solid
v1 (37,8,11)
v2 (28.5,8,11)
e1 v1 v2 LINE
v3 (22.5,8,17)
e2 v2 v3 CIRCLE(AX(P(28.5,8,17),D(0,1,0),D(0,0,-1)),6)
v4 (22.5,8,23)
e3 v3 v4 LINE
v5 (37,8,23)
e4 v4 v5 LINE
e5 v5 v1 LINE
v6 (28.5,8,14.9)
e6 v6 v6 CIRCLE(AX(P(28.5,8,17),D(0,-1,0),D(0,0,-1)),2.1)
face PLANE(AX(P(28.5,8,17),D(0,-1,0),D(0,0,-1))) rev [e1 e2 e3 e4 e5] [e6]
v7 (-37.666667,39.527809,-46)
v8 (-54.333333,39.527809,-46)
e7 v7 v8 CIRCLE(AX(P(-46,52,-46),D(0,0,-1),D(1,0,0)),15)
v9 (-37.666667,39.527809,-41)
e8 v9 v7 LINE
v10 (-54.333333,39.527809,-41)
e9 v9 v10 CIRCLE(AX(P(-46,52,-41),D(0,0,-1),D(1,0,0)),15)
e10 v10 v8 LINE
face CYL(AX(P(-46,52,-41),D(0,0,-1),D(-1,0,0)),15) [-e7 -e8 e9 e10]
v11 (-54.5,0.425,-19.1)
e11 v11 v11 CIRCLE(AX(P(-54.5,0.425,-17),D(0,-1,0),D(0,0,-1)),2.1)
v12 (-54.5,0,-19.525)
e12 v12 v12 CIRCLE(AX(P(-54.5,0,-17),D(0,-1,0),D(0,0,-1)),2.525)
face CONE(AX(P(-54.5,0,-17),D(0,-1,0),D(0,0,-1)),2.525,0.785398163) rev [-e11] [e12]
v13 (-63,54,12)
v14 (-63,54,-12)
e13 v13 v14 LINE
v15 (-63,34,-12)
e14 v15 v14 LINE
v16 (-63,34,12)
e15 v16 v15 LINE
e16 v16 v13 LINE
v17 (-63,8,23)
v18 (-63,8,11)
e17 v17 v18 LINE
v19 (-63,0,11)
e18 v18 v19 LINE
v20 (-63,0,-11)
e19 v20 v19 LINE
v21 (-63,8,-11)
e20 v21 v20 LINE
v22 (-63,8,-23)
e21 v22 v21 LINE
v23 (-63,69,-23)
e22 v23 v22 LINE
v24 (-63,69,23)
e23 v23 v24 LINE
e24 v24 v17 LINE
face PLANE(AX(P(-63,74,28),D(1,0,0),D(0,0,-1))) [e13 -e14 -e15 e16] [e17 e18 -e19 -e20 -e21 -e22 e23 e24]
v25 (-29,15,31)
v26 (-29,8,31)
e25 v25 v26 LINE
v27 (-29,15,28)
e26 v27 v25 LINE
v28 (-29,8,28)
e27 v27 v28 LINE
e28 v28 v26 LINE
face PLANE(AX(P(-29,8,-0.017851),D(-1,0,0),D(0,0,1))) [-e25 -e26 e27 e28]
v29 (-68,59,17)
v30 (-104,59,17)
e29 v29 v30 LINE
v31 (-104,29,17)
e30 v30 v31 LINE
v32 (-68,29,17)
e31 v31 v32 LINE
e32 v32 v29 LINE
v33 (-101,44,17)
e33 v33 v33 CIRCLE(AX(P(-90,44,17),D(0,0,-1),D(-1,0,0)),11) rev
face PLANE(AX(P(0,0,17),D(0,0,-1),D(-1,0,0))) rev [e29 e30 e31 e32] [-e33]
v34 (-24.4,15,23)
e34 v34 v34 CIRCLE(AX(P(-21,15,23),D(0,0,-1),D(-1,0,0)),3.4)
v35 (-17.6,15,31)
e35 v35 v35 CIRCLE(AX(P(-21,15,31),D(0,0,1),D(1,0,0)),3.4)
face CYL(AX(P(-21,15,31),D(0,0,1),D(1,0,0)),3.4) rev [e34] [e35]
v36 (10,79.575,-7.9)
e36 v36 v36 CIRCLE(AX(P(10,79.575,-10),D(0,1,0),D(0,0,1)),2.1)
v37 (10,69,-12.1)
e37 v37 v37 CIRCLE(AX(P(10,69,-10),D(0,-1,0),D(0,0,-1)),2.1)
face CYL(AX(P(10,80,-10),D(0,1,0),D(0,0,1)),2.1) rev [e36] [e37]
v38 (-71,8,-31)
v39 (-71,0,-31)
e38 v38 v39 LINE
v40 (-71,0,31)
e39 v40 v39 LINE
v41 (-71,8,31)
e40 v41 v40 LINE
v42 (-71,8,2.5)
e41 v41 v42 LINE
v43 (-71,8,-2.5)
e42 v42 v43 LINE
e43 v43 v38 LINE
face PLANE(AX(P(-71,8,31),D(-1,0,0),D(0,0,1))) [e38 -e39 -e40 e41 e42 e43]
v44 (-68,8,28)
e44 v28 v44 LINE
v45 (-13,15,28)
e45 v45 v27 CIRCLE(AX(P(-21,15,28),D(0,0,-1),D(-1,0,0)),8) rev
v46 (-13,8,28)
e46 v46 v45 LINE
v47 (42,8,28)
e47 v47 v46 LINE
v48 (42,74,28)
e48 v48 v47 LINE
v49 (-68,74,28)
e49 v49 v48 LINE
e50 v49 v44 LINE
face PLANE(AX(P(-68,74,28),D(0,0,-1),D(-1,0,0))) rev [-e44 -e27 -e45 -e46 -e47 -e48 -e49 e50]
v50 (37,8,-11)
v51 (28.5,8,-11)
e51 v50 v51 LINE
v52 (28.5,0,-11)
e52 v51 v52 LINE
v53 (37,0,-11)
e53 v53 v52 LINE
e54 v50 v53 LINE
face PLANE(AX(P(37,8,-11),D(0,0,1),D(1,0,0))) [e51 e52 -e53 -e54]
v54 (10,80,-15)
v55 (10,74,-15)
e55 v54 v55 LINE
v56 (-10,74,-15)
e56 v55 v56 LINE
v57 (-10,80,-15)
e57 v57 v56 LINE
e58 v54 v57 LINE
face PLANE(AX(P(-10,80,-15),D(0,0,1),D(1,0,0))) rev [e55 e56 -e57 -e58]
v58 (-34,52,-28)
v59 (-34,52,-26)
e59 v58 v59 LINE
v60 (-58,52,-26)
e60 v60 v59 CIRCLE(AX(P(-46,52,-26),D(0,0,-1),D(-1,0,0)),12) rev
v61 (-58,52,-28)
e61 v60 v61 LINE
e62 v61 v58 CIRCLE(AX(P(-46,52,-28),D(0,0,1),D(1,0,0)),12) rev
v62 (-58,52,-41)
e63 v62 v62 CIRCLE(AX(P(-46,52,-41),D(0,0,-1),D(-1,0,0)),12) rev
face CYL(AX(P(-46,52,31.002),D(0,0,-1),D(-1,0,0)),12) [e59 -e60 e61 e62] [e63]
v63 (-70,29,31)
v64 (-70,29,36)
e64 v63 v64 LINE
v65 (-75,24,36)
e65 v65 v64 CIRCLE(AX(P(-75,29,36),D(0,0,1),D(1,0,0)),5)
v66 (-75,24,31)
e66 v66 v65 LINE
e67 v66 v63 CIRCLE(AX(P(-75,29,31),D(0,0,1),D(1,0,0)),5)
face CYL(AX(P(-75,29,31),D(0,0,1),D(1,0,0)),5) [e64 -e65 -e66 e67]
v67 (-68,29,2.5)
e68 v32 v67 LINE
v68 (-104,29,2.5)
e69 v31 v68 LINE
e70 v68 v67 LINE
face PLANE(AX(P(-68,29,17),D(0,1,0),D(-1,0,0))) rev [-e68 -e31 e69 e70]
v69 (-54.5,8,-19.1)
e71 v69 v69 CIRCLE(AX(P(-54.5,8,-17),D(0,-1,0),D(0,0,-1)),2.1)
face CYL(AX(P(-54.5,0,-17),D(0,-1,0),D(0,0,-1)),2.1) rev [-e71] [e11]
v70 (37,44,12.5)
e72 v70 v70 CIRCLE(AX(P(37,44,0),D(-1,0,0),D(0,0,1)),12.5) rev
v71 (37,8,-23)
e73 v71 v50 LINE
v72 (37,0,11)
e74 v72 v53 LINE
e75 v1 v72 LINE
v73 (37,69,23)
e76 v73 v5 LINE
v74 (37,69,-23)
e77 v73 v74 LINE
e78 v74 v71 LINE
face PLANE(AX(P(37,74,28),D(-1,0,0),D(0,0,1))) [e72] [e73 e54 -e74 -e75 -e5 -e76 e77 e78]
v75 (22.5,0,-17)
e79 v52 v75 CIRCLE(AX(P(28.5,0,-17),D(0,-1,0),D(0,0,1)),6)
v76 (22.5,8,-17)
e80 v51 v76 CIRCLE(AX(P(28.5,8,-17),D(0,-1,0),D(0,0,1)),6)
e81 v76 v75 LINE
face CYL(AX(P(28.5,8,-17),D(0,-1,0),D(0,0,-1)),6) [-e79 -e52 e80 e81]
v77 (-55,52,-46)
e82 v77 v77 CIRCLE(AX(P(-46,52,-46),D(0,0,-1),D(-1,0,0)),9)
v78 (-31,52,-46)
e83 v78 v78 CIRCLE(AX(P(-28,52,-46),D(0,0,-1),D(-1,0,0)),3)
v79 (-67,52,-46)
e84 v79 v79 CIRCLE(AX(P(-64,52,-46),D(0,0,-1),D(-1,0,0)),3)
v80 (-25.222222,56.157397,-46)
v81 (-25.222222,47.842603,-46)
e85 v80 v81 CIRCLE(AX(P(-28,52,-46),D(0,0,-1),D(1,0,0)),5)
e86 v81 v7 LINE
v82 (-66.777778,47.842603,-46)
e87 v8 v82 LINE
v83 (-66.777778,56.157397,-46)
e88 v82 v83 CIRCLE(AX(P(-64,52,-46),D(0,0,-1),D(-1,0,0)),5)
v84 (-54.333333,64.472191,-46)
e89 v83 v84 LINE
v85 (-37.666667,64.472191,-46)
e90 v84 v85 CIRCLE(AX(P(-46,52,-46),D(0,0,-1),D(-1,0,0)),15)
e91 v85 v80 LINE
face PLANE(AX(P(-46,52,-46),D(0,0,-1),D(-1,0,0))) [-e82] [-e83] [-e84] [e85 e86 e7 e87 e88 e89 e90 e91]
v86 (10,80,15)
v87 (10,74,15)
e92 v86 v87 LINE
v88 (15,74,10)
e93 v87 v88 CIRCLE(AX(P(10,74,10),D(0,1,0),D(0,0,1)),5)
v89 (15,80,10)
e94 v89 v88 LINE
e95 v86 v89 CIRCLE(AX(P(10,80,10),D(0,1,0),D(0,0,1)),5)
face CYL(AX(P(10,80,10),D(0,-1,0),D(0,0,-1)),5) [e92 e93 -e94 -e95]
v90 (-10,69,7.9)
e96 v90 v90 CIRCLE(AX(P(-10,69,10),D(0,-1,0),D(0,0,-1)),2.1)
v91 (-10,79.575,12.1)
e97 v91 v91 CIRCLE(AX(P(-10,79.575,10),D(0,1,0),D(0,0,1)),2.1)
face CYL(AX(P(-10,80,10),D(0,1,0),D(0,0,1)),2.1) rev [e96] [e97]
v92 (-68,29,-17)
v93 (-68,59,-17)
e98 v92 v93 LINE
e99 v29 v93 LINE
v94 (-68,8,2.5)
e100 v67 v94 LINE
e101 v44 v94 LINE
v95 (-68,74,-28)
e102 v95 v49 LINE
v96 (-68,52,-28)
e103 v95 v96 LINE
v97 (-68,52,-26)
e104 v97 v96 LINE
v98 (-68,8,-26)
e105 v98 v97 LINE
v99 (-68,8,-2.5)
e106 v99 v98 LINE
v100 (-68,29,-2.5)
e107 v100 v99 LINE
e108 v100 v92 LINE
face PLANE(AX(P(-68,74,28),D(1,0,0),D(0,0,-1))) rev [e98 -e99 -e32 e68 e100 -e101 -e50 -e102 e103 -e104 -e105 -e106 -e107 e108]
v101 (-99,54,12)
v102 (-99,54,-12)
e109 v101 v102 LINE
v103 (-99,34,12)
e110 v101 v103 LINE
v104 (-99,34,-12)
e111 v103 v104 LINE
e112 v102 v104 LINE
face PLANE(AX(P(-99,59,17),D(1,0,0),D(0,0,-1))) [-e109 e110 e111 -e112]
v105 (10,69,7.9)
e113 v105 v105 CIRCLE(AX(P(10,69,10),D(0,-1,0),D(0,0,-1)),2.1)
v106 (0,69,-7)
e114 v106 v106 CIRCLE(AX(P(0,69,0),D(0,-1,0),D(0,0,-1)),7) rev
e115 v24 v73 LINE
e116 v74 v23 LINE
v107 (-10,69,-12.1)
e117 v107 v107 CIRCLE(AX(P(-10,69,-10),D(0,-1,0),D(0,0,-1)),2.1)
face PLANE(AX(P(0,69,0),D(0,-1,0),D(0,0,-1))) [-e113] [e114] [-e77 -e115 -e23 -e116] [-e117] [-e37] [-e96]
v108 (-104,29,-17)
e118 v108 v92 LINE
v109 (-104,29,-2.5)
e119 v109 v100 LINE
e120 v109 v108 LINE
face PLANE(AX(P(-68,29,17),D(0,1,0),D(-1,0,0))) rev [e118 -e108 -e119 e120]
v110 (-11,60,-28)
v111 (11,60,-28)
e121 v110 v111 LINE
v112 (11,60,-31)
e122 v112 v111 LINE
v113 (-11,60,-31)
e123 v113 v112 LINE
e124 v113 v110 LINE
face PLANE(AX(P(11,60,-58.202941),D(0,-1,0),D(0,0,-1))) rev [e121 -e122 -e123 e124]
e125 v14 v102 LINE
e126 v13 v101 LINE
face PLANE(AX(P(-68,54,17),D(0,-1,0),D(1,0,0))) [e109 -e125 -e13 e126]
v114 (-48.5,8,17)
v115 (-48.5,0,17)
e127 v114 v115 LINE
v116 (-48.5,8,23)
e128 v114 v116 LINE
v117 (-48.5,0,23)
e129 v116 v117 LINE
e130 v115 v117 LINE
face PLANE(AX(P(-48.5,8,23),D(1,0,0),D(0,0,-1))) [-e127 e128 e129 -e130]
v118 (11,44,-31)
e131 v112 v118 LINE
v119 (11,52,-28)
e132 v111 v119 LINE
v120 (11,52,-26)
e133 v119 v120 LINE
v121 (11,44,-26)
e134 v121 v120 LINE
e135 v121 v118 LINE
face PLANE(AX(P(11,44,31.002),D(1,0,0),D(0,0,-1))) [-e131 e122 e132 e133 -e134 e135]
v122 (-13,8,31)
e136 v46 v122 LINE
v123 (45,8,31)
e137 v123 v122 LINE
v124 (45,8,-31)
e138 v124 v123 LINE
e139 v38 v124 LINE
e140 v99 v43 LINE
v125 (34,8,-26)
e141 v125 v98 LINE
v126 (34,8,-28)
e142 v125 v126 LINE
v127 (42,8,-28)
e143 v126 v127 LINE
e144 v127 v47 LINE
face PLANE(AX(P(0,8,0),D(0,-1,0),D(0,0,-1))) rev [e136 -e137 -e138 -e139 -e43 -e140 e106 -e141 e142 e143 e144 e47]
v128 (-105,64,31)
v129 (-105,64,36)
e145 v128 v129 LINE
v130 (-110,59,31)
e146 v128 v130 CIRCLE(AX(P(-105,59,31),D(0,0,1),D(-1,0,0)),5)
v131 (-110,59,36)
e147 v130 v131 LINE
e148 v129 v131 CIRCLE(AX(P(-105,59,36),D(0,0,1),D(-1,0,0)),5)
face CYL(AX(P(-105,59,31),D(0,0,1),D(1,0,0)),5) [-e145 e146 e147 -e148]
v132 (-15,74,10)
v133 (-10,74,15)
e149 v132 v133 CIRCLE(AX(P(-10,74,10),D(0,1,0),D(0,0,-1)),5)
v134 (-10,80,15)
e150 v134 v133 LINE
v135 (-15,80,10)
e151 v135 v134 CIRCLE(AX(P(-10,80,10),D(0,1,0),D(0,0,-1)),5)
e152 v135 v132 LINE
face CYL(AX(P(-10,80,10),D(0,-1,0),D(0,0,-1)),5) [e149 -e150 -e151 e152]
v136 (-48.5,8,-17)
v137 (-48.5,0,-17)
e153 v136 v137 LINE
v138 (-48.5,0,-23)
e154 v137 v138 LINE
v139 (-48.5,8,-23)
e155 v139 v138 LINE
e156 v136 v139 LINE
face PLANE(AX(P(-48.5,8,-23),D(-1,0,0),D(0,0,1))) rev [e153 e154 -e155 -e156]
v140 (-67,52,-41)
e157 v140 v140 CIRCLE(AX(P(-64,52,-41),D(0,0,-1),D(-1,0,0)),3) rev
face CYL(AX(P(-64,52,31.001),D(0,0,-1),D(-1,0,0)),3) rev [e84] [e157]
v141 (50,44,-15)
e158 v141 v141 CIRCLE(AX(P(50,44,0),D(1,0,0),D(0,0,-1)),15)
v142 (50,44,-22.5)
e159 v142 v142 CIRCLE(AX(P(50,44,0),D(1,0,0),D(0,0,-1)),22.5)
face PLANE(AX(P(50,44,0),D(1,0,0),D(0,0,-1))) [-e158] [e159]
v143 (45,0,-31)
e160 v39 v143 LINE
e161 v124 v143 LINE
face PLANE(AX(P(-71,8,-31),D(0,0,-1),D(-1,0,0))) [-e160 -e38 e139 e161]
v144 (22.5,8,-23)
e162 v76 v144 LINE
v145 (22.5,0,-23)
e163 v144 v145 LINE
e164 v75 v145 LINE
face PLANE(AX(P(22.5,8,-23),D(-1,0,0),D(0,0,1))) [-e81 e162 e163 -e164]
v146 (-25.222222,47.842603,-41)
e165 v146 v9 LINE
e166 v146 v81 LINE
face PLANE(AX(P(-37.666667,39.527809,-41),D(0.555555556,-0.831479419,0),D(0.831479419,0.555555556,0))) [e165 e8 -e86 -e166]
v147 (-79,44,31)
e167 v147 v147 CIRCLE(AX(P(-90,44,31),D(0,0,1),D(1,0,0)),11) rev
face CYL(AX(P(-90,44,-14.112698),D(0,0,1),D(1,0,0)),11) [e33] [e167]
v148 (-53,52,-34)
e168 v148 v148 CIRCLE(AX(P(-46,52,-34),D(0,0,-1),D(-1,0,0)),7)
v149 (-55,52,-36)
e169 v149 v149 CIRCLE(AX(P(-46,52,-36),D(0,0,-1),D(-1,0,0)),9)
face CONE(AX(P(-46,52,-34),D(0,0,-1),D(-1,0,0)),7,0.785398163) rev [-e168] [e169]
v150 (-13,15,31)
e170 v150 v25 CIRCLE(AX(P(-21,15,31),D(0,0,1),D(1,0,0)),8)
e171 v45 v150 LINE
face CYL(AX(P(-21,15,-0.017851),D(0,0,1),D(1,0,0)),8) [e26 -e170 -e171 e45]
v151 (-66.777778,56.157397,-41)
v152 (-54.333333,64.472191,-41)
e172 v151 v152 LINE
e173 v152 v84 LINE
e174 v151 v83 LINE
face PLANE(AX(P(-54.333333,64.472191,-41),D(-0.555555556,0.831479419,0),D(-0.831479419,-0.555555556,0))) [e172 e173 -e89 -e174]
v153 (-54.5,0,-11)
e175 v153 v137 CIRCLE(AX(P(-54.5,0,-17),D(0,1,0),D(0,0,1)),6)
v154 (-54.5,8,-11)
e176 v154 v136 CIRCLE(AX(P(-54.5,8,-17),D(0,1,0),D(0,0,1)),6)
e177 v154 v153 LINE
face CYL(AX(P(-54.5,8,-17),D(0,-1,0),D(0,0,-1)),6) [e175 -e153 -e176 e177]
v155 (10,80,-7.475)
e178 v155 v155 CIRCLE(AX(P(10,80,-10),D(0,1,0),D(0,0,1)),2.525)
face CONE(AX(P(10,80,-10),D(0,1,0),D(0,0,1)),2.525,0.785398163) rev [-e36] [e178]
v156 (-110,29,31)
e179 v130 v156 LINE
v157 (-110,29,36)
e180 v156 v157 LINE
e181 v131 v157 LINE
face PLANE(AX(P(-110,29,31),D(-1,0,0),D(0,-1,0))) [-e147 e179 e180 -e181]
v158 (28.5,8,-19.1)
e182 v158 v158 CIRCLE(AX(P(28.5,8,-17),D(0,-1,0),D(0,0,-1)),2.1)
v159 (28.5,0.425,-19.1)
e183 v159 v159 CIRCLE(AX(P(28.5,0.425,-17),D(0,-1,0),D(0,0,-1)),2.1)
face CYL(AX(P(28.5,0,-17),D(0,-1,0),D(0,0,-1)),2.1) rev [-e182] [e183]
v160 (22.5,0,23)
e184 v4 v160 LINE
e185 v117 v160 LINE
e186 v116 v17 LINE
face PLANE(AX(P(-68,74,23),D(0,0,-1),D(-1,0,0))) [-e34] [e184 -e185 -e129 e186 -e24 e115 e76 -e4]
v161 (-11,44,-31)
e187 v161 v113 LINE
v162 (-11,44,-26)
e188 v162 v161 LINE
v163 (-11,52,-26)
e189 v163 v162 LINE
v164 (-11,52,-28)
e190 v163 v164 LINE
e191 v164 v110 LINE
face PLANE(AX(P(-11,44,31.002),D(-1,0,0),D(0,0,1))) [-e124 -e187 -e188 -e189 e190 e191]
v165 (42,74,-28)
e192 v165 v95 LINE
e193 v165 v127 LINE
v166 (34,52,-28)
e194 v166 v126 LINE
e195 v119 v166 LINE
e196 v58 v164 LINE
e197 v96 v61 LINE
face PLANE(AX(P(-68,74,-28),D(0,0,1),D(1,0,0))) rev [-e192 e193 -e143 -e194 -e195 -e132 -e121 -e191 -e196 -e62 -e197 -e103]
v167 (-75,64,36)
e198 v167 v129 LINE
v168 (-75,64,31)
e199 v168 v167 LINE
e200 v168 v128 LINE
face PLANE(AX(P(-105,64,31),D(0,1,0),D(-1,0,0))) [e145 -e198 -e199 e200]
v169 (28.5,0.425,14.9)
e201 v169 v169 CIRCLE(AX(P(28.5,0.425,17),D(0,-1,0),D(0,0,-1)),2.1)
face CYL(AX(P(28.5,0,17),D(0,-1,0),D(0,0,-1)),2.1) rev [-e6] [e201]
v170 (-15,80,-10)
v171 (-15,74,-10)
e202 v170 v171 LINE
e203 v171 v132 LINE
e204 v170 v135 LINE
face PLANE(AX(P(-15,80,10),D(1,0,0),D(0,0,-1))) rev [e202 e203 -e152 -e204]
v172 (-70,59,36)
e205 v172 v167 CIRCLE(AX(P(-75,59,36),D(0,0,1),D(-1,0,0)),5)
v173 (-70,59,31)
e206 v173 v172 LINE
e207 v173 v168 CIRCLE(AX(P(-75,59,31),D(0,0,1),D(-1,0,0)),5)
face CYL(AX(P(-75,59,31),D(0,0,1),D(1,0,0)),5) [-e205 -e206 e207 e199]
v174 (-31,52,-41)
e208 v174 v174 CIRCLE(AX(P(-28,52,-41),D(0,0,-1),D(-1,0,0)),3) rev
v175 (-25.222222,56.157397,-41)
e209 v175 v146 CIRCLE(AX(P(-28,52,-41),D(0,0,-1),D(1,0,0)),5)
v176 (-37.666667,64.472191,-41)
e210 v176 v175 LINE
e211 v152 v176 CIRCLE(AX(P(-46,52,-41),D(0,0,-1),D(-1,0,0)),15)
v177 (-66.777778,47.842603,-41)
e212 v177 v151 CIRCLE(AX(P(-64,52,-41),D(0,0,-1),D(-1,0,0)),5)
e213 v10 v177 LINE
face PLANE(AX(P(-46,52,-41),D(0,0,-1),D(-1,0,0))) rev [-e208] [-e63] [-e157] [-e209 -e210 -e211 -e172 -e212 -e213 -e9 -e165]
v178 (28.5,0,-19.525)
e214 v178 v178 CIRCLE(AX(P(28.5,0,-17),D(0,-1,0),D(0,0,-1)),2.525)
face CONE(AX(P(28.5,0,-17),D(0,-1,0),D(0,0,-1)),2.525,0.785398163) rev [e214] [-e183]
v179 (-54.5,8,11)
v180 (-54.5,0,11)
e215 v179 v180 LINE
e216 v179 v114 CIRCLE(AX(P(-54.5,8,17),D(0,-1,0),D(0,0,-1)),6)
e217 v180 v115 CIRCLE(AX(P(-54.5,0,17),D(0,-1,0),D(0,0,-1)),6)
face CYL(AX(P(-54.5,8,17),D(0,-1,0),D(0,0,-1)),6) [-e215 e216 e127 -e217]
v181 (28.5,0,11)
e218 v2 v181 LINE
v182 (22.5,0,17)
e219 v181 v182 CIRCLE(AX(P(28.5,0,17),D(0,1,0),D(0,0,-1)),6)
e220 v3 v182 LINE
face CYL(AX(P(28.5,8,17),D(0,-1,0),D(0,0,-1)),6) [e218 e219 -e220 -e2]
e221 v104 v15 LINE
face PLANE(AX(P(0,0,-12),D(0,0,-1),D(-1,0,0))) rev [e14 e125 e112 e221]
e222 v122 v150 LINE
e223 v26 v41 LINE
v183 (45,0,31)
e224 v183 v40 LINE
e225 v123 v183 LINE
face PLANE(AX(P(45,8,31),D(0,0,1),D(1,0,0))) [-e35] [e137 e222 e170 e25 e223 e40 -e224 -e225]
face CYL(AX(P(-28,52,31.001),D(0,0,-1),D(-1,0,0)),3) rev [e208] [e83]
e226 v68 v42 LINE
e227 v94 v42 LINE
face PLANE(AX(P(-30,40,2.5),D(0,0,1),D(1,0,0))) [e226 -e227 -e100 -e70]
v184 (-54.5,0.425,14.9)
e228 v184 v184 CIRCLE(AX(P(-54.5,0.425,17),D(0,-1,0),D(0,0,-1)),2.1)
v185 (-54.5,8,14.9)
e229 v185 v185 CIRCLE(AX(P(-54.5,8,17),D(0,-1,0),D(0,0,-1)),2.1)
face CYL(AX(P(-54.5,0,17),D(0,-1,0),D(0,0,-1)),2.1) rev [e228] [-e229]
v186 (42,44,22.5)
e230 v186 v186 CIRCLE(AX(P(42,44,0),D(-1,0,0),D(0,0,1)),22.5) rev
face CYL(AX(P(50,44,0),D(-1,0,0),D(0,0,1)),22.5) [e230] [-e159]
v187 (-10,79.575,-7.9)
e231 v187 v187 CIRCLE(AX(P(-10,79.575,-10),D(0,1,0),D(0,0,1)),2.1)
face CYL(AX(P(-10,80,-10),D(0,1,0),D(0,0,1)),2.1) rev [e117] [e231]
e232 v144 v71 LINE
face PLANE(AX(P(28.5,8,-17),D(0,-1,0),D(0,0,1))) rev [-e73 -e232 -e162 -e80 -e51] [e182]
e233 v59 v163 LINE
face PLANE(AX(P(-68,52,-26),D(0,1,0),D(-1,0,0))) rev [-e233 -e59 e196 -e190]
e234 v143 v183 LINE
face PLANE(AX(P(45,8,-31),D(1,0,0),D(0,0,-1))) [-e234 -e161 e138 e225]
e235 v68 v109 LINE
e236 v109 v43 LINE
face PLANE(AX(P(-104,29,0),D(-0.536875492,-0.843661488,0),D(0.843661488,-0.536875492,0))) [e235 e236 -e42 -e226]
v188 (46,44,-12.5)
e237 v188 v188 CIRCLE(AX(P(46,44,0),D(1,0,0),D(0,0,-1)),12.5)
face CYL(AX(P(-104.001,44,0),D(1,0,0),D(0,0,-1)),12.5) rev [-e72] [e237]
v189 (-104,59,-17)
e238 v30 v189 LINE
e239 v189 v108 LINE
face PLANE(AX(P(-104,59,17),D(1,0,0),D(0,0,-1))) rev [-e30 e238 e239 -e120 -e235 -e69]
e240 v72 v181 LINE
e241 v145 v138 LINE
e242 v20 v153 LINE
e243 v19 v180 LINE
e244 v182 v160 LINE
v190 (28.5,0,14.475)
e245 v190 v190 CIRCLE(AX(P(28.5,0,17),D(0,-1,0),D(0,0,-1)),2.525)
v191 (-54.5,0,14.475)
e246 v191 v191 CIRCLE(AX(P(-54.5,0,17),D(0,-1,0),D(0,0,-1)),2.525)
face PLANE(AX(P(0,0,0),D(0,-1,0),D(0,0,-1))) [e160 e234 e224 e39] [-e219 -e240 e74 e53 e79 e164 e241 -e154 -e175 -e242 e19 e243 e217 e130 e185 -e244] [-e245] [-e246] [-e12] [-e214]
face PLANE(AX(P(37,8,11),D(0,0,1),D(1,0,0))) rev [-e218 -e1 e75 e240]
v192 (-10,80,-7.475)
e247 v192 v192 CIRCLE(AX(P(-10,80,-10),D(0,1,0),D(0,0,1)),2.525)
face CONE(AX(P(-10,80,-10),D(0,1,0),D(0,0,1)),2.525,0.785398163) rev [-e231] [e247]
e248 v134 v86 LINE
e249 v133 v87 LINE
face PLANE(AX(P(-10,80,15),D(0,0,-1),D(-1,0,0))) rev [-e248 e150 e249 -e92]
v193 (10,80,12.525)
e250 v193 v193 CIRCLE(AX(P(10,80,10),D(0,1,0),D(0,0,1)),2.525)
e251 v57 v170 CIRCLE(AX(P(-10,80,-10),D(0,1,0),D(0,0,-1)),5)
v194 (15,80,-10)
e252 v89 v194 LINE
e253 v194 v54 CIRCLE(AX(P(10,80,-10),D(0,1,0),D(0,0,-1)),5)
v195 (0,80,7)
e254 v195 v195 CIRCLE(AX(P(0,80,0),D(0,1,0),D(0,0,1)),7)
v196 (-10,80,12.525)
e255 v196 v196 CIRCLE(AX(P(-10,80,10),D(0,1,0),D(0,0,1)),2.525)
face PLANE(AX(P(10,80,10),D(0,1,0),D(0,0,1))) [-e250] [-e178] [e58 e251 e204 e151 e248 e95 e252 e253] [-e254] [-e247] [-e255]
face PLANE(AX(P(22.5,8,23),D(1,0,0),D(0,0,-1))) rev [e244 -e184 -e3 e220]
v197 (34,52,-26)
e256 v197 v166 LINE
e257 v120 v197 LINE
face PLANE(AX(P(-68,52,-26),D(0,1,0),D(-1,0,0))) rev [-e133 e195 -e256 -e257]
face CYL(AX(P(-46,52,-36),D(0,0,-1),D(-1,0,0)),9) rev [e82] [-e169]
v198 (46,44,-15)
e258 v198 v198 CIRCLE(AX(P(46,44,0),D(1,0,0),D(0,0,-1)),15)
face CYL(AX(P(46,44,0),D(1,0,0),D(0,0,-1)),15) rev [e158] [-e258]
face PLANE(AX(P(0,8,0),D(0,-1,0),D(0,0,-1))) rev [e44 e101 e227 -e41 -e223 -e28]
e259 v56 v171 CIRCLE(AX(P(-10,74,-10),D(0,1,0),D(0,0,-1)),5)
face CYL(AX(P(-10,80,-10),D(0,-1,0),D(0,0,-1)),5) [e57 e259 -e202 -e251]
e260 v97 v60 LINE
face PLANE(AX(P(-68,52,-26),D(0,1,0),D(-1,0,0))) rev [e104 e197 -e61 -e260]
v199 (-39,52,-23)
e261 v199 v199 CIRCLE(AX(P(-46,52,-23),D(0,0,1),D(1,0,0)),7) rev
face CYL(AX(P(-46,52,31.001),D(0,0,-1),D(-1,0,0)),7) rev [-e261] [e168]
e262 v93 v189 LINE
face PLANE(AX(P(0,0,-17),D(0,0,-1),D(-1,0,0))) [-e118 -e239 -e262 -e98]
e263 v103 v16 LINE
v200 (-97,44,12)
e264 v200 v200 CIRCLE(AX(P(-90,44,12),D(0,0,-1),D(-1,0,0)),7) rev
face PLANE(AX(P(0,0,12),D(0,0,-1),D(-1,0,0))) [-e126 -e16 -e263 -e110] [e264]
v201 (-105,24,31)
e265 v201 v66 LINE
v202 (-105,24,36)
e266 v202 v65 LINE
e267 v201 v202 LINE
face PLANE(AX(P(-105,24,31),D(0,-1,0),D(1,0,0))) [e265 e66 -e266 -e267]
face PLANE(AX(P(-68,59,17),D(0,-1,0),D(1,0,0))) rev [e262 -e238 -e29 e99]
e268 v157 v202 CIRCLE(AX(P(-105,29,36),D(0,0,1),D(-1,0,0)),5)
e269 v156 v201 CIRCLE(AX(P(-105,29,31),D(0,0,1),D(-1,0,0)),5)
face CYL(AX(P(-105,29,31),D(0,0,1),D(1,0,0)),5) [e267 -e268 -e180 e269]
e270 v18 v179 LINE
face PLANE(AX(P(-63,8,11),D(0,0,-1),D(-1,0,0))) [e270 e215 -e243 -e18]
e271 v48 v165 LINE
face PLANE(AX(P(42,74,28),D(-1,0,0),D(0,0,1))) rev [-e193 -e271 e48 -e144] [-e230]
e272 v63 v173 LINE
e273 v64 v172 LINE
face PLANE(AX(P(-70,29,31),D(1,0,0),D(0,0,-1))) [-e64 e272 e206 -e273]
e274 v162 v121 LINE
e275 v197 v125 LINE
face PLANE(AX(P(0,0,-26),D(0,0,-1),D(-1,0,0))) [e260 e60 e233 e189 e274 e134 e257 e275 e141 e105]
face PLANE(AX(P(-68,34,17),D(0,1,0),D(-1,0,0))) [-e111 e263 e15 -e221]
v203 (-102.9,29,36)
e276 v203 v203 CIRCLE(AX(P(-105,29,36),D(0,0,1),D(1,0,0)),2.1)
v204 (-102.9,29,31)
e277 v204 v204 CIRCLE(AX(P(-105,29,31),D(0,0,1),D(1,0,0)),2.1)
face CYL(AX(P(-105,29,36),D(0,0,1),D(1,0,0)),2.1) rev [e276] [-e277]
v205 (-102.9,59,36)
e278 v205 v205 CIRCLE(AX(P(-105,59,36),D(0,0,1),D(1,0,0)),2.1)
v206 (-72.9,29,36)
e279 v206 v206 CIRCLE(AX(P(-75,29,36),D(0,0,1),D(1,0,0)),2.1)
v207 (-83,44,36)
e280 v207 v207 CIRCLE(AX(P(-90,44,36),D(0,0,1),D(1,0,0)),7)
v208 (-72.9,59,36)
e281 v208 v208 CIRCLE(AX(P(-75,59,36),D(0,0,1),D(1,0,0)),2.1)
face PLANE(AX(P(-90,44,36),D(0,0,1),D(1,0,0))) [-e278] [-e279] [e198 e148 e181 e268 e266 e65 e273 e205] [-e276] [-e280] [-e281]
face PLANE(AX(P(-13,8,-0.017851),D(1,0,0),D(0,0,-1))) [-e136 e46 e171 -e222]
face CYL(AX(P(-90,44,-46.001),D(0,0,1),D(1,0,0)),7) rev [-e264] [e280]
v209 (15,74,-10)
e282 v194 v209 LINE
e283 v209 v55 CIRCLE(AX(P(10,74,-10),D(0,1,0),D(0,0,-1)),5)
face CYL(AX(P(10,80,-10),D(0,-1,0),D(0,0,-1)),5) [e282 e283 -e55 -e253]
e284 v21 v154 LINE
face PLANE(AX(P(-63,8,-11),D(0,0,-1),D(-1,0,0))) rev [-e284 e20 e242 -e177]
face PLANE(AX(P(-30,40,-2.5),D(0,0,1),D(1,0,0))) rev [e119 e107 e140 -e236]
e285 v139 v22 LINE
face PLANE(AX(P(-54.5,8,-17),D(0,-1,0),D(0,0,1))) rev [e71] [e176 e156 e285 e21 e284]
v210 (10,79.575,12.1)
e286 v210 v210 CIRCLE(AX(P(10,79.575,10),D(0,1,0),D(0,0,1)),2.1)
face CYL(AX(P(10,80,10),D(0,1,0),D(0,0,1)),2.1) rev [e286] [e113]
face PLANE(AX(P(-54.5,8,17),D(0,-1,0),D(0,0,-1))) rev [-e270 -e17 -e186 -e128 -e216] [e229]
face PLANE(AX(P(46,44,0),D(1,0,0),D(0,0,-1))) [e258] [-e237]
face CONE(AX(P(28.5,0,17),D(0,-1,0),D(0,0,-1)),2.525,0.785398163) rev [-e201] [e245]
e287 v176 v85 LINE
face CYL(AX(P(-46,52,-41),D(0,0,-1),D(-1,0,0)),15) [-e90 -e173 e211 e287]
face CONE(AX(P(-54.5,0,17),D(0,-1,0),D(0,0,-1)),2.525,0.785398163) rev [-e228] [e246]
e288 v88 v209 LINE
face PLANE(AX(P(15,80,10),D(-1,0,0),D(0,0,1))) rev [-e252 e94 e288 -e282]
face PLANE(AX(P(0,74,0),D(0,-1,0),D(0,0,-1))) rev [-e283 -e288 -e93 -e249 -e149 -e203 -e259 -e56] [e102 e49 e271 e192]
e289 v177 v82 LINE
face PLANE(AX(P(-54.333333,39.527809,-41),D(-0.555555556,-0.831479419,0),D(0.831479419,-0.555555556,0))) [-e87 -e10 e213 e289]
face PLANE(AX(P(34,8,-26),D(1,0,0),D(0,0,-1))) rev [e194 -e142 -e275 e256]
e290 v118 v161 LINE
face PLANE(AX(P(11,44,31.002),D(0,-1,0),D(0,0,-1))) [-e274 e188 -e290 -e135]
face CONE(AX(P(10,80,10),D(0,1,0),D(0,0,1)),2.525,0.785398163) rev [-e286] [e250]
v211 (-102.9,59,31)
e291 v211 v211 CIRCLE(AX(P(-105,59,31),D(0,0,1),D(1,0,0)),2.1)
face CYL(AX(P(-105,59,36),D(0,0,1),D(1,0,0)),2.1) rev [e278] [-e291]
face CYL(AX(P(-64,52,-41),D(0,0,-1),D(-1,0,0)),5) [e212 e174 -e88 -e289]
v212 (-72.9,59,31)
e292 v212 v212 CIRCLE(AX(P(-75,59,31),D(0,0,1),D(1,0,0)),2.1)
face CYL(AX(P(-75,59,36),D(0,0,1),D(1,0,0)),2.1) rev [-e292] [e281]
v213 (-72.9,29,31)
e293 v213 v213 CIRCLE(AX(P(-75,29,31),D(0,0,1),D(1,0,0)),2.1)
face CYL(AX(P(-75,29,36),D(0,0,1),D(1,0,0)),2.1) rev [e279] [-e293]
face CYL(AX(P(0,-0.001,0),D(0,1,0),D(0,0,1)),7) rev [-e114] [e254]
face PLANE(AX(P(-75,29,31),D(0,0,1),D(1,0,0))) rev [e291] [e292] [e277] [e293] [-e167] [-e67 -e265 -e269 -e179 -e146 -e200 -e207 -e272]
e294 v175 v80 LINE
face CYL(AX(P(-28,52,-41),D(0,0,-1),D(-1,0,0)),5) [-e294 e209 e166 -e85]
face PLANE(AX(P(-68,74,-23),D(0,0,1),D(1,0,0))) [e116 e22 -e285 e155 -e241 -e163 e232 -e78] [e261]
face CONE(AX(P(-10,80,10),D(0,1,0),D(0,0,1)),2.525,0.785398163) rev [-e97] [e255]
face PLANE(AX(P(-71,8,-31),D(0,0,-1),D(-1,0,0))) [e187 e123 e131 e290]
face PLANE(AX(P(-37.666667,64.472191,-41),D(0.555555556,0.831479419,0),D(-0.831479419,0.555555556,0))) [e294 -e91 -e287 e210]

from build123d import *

# Parameters (mm, degrees)
SKETCH_1_W                                = 110
SKETCH_1_H                                = 56
EXTRUDE_1_DEPTH                           = 74
SKETCH_2_W                                = 36
SKETCH_2_H                                = 30
EXTRUDE_2_DEPTH                           = 17
SHELL_1_T                                 = -5
SKETCH_3_W                                = 116
SKETCH_3_H                                = 62
SKETCH_3_W_2                              = 110
SKETCH_3_H_2                              = 56
EXTRUDE_3_DEPTH                           = 8
EXTRUDE_4_DEPTH                           = 8
MIRROR_1_AT_THE_SECOND_PLANE_COPY_1_DEPTH = 8
HOLE_WIZARD_M5_1_D                        = 4.2
HOLE_WIZARD_M5_1_DEPTH                    = 8
HOLE_WIZARD_M5_1_CSINK_D                  = 5.05
HOLE_WIZARD_M5_1_CSINK_ANGLE              = 90
EXTRUDE_5_DEPTH                           = 6
HOLE_WIZARD_M5_2_D                        = 4.2
HOLE_WIZARD_M5_2_CSINK_D                  = 5.05
HOLE_WIZARD_M5_2_CSINK_ANGLE              = 90
CUT_EXTRUDE_1_REACH                       = 136.822
SKETCH_10_R                               = 7
SKETCH_29_W                               = 102
SKETCH_29_H                               = 44
CUT_EXTRUDE_8_DEPTH                       = 2
EXTRUDE_START                             = 26
SKETCH_11_R                               = 12
EXTRUDE_6_DEPTH                           = 20
EXTRUDE_7_DEPTH                           = 5
CUT_EXTRUDE_2_REACH                       = 154.135
SKETCH_13_R                               = 3
SKETCH_14_R                               = 9
CUT_EXTRUDE_3_DEPTH                       = 10
CUT_EXTRUDE_4_REACH                       = 149.326
SKETCH_15_R                               = 7
CHAMFER_1_SIZE                            = 2
EXTRUDE_8_REACH                           = 145.865
SKETCH_16_W                               = 22
SKETCH_16_H                               = 16
EXTRUDE_8_DIRECTION_2_REACH               = 145.865
SKETCH_17_R                               = 22.5
EXTRUDE_9_DEPTH                           = 8
SKETCH_18_R                               = 15
CUT_EXTRUDE_5_DEPTH                       = 4
CUT_EXTRUDE_6_REACH                       = 178.114
SKETCH_19_R                               = 12.5
EXTRUDE_10_DEPTH                          = 3
HOLE_WIZARD_M8_1_D                        = 6.8
HOLE_WIZARD_M8_1_DEPTH                    = 8
EXTRUDE_START_2                           = 17
SKETCH_23_R                               = 11
EXTRUDE_11_DEPTH                          = 19
EXTRUDE_12_DEPTH                          = 5
HOLE_START                                = 31
HOLE_WIZARD_M5_3_OUTLINE_R                = 2.1
HOLE_WIZARD_M5_3_DEPTH                    = 5
CUT_EXTRUDE_7_REACH                       = 160.821
SKETCH_27_R                               = 7
RIB_1_REACH                               = 145.583
SKETCH_30_WALL_W                          = 328.280671964
SKETCH_30_WALL_H                          = 5


# Read off the part's stored shape, not the designer's step: M5 螺纹孔3
with BuildPart() as part:
    # 草图1 → 凸台-拉伸1 (new body)
    with BuildSketch(Plane(origin=(0, 0, 0), x_dir=(1, 0, 0), z_dir=(0, 1, 0))):
        with Locations((-13, 0)):
            Rectangle(SKETCH_1_W, SKETCH_1_H)
    extrude(amount=EXTRUDE_1_DEPTH)

    # 草图2 → 凸台-拉伸2 (add, symmetric)
    with BuildSketch(Plane.XY):
        with Locations((-86, 44)):
            Rectangle(SKETCH_2_W, SKETCH_2_H)
    extrude(amount=EXTRUDE_2_DEPTH, both=True)

    # 抽壳1
    shell_1_openings = [part.faces().sort_by_distance(p)[0] for p in [
        (-13, 0, 0),
    ]]
    offset(amount=SHELL_1_T, openings=shell_1_openings, kind=Kind.INTERSECTION)

    # 草图3 → 凸台-拉伸3 (add)
    with BuildSketch(Plane.XZ):
        with Locations((-13, 0)):
            Rectangle(SKETCH_3_W, SKETCH_3_H)
        with Locations((-13, 0)):
            Rectangle(SKETCH_3_W_2, SKETCH_3_H_2, mode=Mode.SUBTRACT)
    extrude(amount=-EXTRUDE_3_DEPTH)

    # 草图4 → 凸台-拉伸4 (add)
    with BuildSketch(Plane.XZ):
        with BuildLine():
            Line((-63, 23), (-48.5, 23))
            Line((-48.5, 23), (-48.5, 17))
            ThreePointArc((-48.5, 17), (-50.257359313, 12.757359313), (-54.5, 11))
            Line((-54.5, 11), (-63, 11))
            Line((-63, 11), (-63, 23))
        make_face()
    extrude_4 = extrude(amount=-EXTRUDE_4_DEPTH)

    # 镜向1: 凸台-拉伸4 across plane
    add(extrude_4.mirror(Plane.ZY.offset(13)))

    # 镜向1 at the second plane: 凸台-拉伸4 across plane
    add(extrude_4.mirror(Plane.XY))

    # 镜向1 at the second plane copy 1 sket → 镜向1 at the second plane copy 1 (add)
    with BuildSketch(Plane(origin=(-26, 0, 0), x_dir=(-1, 0, 0), z_dir=(0, -1, 0))):
        with BuildLine():
            Line((-63, 23), (-48.5, 23))
            Line((-48.5, 23), (-48.5, 17))
            ThreePointArc((-48.5, 17), (-50.257359313, 12.757359313), (-54.5, 11))
            Line((-54.5, 11), (-63, 11))
            Line((-63, 11), (-63, 23))
        make_face()
    extrude(amount=-MIRROR_1_AT_THE_SECOND_PLANE_COPY_1_DEPTH)

    # M5 螺纹孔1
    with Locations(Plane.XZ):
        with Locations((28.5, 17), (-54.5, 17), (-54.5, -17), (28.5, -17)):
            CounterSinkHole(HOLE_WIZARD_M5_1_D / 2, HOLE_WIZARD_M5_1_CSINK_D / 2, depth=HOLE_WIZARD_M5_1_DEPTH, counter_sink_angle=HOLE_WIZARD_M5_1_CSINK_ANGLE)

    # 草图7 → 凸台-拉伸5 (add)
    with BuildSketch(Plane(origin=(0, 74, 0), x_dir=(1, 0, 0), z_dir=(0, 1, 0))):
        with BuildLine():
            Line((-10, -15), (10, -15))
            ThreePointArc((10, -15), (13.535533906, -13.535533906), (15, -10))
            Line((15, -10), (15, 10))
            ThreePointArc((15, 10), (13.535533906, 13.535533906), (10, 15))
            Line((10, 15), (-10, 15))
            ThreePointArc((-10, 15), (-13.535533906, 13.535533906), (-15, 10))
            Line((-15, 10), (-15, -10))
            ThreePointArc((-15, -10), (-13.535533906, -13.535533906), (-10, -15))
        make_face()
    extrude(amount=EXTRUDE_5_DEPTH)

    # M5 螺纹孔2 (through all)
    with Locations(Plane(origin=(0, 80, 0), x_dir=(1, 0, 0), z_dir=(0, 1, 0))):
        with Locations((10, 10), (-10, 10), (-10, -10), (10, -10)):
            CounterSinkHole(HOLE_WIZARD_M5_2_D / 2, HOLE_WIZARD_M5_2_CSINK_D / 2, counter_sink_angle=HOLE_WIZARD_M5_2_CSINK_ANGLE)

    # 草图10 → 切除-拉伸1 (cut, up to next)
    with BuildSketch(Plane(origin=(0, 80, 0), x_dir=(1, 0, 0), z_dir=(0, 1, 0)), mode=Mode.PRIVATE) as cut_extrude_1_sk1:
        with Locations(Location((0, 0, 0), (0, 0, 270))):
            Circle(SKETCH_10_R)
    cut_extrude_1_tool1 = extrude(cut_extrude_1_sk1.sketch, amount=-CUT_EXTRUDE_1_REACH, mode=Mode.PRIVATE) & part.part
    add(cut_extrude_1_tool1.solids().sort_by_distance((0, 80, 0))[0], mode=Mode.SUBTRACT)

    # 草图29 → 切除-拉伸8 (cut)
    with BuildSketch(Plane(origin=(0, 0, -28), x_dir=(-1, 0, 0), z_dir=(0, 0, -1))):
        with Locations((17, 30)):
            Rectangle(SKETCH_29_W, SKETCH_29_H)
    extrude(amount=-CUT_EXTRUDE_8_DEPTH, mode=Mode.SUBTRACT)

    # 草图11 → 凸台-拉伸6 (add)
    with BuildSketch(Plane(origin=(0, 0, 0), x_dir=(-1, 0, 0), z_dir=(0, 0, -1)).offset(EXTRUDE_START)):
        with Locations((46, 52)):
            Circle(SKETCH_11_R)
    extrude(amount=EXTRUDE_6_DEPTH)

    # 草图12 → 凸台-拉伸7 (add)
    with BuildSketch(Plane(origin=(0, 0, -46), x_dir=(-1, 0, 0), z_dir=(0, 0, -1))):
        with BuildLine():
            Line((54.333333333, 64.472191289), (66.777777778, 56.157397096))
            ThreePointArc((66.777777778, 56.157397096), (69, 52), (66.777777778, 47.842602904))
            Line((66.777777778, 47.842602904), (54.333333333, 39.527808711))
            ThreePointArc((54.333333333, 39.527808711), (46, 37), (37.666666667, 39.527808711))
            Line((37.666666667, 39.527808711), (25.222222222, 47.842602904))
            ThreePointArc((25.222222222, 47.842602904), (23, 52), (25.222222222, 56.157397096))
            Line((25.222222222, 56.157397096), (37.666666667, 64.472191289))
            ThreePointArc((37.666666667, 64.472191289), (46, 67), (54.333333333, 64.472191289))
        make_face()
    extrude(amount=-EXTRUDE_7_DEPTH)

    # 草图13 → 切除-拉伸2 (cut, up to next)
    with BuildSketch(Plane(origin=(0, 0, -46), x_dir=(-1, 0, 0), z_dir=(0, 0, -1)), mode=Mode.PRIVATE) as cut_extrude_2_sk1:
        with Locations((28, 52)):
            Circle(SKETCH_13_R)
    cut_extrude_2_tool1 = extrude(cut_extrude_2_sk1.sketch, amount=-CUT_EXTRUDE_2_REACH, mode=Mode.PRIVATE) & part.part
    # 草图13 → 切除-拉伸2 (cut, up to next)
    with BuildSketch(Plane(origin=(0, 0, -46), x_dir=(-1, 0, 0), z_dir=(0, 0, -1)), mode=Mode.PRIVATE) as cut_extrude_2_sk2:
        with Locations((64, 52)):
            Circle(SKETCH_13_R)
    cut_extrude_2_tool2 = extrude(cut_extrude_2_sk2.sketch, amount=-CUT_EXTRUDE_2_REACH, mode=Mode.PRIVATE) & part.part
    add(cut_extrude_2_tool1.solids().sort_by_distance((-28, 52, -46))[0], mode=Mode.SUBTRACT)
    add(cut_extrude_2_tool2.solids().sort_by_distance((-64, 52, -46))[0], mode=Mode.SUBTRACT)

    # 草图14 → 切除-拉伸3 (cut)
    with BuildSketch(Plane(origin=(0, 0, -46), x_dir=(-1, 0, 0), z_dir=(0, 0, -1))):
        with Locations((46, 52)):
            Circle(SKETCH_14_R)
    extrude(amount=-CUT_EXTRUDE_3_DEPTH, mode=Mode.SUBTRACT)

    # 草图15 → 切除-拉伸4 (cut, up to next)
    with BuildSketch(Plane(origin=(0, 0, -36), x_dir=(-1, 0, 0), z_dir=(0, 0, -1)), mode=Mode.PRIVATE) as cut_extrude_4_sk1:
        with Locations((46, 52)):
            Circle(SKETCH_15_R)
    cut_extrude_4_tool1 = extrude(cut_extrude_4_sk1.sketch, amount=-CUT_EXTRUDE_4_REACH, mode=Mode.PRIVATE) & part.part
    add(cut_extrude_4_tool1.solids().sort_by_distance((-46, 52, -36))[0], mode=Mode.SUBTRACT)

    # 倒角1
    chamfer_1_edges = [part.edges().sort_by_distance(p)[0] for p in [
        (-39, 52, -36),
    ]]
    chamfer(chamfer_1_edges, length=CHAMFER_1_SIZE - 0.0001)  # a hair under: the kernel refuses the full size

    # 凸台-拉伸8: up to this face of the body (flat: up to its plane)
    extrude_8_end = Plane(part.part.faces().sort_by_distance((-13, 4, -31))[0])
    # 草图16 → 凸台-拉伸8 (add, up to the picked face)
    with BuildSketch(Plane(origin=(0, 0, -28), x_dir=(-1, 0, 0), z_dir=(0, 0, -1)), mode=Mode.PRIVATE) as extrude_8_sk1:
        with Locations((0, 52)):
            Rectangle(SKETCH_16_W, SKETCH_16_H)
    extrude_8_tool1 = split(extrude(extrude_8_sk1.sketch, amount=EXTRUDE_8_REACH, mode=Mode.PRIVATE), bisect_by=extrude_8_end, keep=Keep.BOTH, mode=Mode.PRIVATE)
    add(extrude_8_tool1.solids().sort_by(Axis((0, 52, -28), (0, 0, -1)))[0])

    # 草图16 → 凸台-拉伸8 direction 2 (add, up to next)
    with BuildSketch(Plane(origin=(0, 0, -28), x_dir=(-1, 0, 0), z_dir=(0, 0, -1)), mode=Mode.PRIVATE) as extrude_8_direction_2_sk1:
        with Locations((0, 52)):
            Rectangle(SKETCH_16_W, SKETCH_16_H)
    extrude_8_direction_2_tool1 = extrude(extrude_8_direction_2_sk1.sketch, amount=-EXTRUDE_8_DIRECTION_2_REACH, mode=Mode.PRIVATE) - part.part
    add(extrude_8_direction_2_tool1.solids().sort_by_distance((0, 52, -28))[0])

    # 草图17 → 凸台-拉伸9 (add)
    with BuildSketch(Plane(origin=(42, 0, 0), x_dir=(0, 0, -1), z_dir=(1, 0, 0))):
        with Locations(Location((0, 44, 0), (0, 0, 180))):
            Circle(SKETCH_17_R)
    extrude(amount=EXTRUDE_9_DEPTH)

    # 草图18 → 切除-拉伸5 (cut)
    with BuildSketch(Plane(origin=(50, 0, 0), x_dir=(0, 0, -1), z_dir=(1, 0, 0))):
        with Locations((0, 44)):
            Circle(SKETCH_18_R)
    extrude(amount=-CUT_EXTRUDE_5_DEPTH, mode=Mode.SUBTRACT)

    # 草图19 → 切除-拉伸6 (cut, up to next)
    with BuildSketch(Plane(origin=(46, 0, 0), x_dir=(0, 0, -1), z_dir=(1, 0, 0)), mode=Mode.PRIVATE) as cut_extrude_6_sk1:
        with Locations((0, 44)):
            Circle(SKETCH_19_R)
    cut_extrude_6_tool1 = extrude(cut_extrude_6_sk1.sketch, amount=-CUT_EXTRUDE_6_REACH, mode=Mode.PRIVATE) & part.part
    add(cut_extrude_6_tool1.solids().sort_by_distance((46, 44, 0))[0], mode=Mode.SUBTRACT)

    # 草图20 → 凸台-拉伸10 (add)
    with BuildSketch(Plane.XY.offset(31)):
        with BuildLine():
            Line((-29, 8), (-29, 15))
            ThreePointArc((-29, 15), (-21, 23), (-13, 15))
            Line((-13, 15), (-13, 8))
            ThreePointArc((-13, 8), (-21, 0), (-29, 8))
        make_face()
    extrude(amount=-EXTRUDE_10_DEPTH)

    # M8 螺纹孔1
    with Locations(Plane.XY.offset(31)):
        with Locations((-21, 15)):
            Hole(HOLE_WIZARD_M8_1_D / 2, depth=HOLE_WIZARD_M8_1_DEPTH)

    # 草图23 → 凸台-拉伸11 (add)
    with BuildSketch(Plane.XY.offset(EXTRUDE_START_2)):
        with Locations((-90, 44)):
            Circle(SKETCH_23_R)
    extrude(amount=EXTRUDE_11_DEPTH)

    # 草图24 → 凸台-拉伸12 (add)
    with BuildSketch(Plane.XY.offset(36)):
        with BuildLine():
            Line((-105, 24), (-75, 24))
            ThreePointArc((-75, 24), (-71.464466094, 25.464466094), (-70, 29))
            Line((-70, 29), (-70, 59))
            ThreePointArc((-70, 59), (-71.464466094, 62.535533906), (-75, 64))
            Line((-75, 64), (-105, 64))
            ThreePointArc((-105, 64), (-108.535533906, 62.535533906), (-110, 59))
            Line((-110, 59), (-110, 29))
            ThreePointArc((-110, 29), (-108.535533906, 25.464466094), (-105, 24))
        make_face()
    extrude(amount=-EXTRUDE_12_DEPTH)

    # M5 螺纹孔3 outline → M5 螺纹孔3 (cut)
    with BuildSketch(Plane.XY.offset(HOLE_START)):
        with Locations((-75, 59)):
            Circle(HOLE_WIZARD_M5_3_OUTLINE_R)
        with Locations((-75, 29)):
            Circle(HOLE_WIZARD_M5_3_OUTLINE_R)
        with Locations((-105, 29)):
            Circle(HOLE_WIZARD_M5_3_OUTLINE_R)
        with Locations((-105, 59)):
            Circle(HOLE_WIZARD_M5_3_OUTLINE_R)
    extrude(amount=HOLE_WIZARD_M5_3_DEPTH, mode=Mode.SUBTRACT)

    # 草图27 → 切除-拉伸7 (cut, up to next)
    with BuildSketch(Plane.XY.offset(36), mode=Mode.PRIVATE) as cut_extrude_7_sk1:
        with Locations((-90, 44)):
            Circle(SKETCH_27_R)
    cut_extrude_7_tool1 = extrude(cut_extrude_7_sk1.sketch, amount=-CUT_EXTRUDE_7_REACH, mode=Mode.PRIVATE) & part.part
    add(cut_extrude_7_tool1.solids().sort_by_distance((-90, 44, 36))[0], mode=Mode.SUBTRACT)

    # 草图30 wall → 筋1 (add, up to next)
    with BuildSketch(Plane(origin=(-87.5, 18.5, 0), x_dir=(0.843661487732, -0.536875492193, 0), z_dir=(0.536875492193, 0.843661487732, 0)), mode=Mode.PRIVATE) as rib_1_sk1:
        Rectangle(SKETCH_30_WALL_W, SKETCH_30_WALL_H)
    rib_1_tool1 = extrude(rib_1_sk1.sketch, amount=RIB_1_REACH, mode=Mode.PRIVATE) - part.part
    add(rib_1_tool1.solids().sort_by_distance((-87.5, 18.5, 0))[0])


solid = part.part
